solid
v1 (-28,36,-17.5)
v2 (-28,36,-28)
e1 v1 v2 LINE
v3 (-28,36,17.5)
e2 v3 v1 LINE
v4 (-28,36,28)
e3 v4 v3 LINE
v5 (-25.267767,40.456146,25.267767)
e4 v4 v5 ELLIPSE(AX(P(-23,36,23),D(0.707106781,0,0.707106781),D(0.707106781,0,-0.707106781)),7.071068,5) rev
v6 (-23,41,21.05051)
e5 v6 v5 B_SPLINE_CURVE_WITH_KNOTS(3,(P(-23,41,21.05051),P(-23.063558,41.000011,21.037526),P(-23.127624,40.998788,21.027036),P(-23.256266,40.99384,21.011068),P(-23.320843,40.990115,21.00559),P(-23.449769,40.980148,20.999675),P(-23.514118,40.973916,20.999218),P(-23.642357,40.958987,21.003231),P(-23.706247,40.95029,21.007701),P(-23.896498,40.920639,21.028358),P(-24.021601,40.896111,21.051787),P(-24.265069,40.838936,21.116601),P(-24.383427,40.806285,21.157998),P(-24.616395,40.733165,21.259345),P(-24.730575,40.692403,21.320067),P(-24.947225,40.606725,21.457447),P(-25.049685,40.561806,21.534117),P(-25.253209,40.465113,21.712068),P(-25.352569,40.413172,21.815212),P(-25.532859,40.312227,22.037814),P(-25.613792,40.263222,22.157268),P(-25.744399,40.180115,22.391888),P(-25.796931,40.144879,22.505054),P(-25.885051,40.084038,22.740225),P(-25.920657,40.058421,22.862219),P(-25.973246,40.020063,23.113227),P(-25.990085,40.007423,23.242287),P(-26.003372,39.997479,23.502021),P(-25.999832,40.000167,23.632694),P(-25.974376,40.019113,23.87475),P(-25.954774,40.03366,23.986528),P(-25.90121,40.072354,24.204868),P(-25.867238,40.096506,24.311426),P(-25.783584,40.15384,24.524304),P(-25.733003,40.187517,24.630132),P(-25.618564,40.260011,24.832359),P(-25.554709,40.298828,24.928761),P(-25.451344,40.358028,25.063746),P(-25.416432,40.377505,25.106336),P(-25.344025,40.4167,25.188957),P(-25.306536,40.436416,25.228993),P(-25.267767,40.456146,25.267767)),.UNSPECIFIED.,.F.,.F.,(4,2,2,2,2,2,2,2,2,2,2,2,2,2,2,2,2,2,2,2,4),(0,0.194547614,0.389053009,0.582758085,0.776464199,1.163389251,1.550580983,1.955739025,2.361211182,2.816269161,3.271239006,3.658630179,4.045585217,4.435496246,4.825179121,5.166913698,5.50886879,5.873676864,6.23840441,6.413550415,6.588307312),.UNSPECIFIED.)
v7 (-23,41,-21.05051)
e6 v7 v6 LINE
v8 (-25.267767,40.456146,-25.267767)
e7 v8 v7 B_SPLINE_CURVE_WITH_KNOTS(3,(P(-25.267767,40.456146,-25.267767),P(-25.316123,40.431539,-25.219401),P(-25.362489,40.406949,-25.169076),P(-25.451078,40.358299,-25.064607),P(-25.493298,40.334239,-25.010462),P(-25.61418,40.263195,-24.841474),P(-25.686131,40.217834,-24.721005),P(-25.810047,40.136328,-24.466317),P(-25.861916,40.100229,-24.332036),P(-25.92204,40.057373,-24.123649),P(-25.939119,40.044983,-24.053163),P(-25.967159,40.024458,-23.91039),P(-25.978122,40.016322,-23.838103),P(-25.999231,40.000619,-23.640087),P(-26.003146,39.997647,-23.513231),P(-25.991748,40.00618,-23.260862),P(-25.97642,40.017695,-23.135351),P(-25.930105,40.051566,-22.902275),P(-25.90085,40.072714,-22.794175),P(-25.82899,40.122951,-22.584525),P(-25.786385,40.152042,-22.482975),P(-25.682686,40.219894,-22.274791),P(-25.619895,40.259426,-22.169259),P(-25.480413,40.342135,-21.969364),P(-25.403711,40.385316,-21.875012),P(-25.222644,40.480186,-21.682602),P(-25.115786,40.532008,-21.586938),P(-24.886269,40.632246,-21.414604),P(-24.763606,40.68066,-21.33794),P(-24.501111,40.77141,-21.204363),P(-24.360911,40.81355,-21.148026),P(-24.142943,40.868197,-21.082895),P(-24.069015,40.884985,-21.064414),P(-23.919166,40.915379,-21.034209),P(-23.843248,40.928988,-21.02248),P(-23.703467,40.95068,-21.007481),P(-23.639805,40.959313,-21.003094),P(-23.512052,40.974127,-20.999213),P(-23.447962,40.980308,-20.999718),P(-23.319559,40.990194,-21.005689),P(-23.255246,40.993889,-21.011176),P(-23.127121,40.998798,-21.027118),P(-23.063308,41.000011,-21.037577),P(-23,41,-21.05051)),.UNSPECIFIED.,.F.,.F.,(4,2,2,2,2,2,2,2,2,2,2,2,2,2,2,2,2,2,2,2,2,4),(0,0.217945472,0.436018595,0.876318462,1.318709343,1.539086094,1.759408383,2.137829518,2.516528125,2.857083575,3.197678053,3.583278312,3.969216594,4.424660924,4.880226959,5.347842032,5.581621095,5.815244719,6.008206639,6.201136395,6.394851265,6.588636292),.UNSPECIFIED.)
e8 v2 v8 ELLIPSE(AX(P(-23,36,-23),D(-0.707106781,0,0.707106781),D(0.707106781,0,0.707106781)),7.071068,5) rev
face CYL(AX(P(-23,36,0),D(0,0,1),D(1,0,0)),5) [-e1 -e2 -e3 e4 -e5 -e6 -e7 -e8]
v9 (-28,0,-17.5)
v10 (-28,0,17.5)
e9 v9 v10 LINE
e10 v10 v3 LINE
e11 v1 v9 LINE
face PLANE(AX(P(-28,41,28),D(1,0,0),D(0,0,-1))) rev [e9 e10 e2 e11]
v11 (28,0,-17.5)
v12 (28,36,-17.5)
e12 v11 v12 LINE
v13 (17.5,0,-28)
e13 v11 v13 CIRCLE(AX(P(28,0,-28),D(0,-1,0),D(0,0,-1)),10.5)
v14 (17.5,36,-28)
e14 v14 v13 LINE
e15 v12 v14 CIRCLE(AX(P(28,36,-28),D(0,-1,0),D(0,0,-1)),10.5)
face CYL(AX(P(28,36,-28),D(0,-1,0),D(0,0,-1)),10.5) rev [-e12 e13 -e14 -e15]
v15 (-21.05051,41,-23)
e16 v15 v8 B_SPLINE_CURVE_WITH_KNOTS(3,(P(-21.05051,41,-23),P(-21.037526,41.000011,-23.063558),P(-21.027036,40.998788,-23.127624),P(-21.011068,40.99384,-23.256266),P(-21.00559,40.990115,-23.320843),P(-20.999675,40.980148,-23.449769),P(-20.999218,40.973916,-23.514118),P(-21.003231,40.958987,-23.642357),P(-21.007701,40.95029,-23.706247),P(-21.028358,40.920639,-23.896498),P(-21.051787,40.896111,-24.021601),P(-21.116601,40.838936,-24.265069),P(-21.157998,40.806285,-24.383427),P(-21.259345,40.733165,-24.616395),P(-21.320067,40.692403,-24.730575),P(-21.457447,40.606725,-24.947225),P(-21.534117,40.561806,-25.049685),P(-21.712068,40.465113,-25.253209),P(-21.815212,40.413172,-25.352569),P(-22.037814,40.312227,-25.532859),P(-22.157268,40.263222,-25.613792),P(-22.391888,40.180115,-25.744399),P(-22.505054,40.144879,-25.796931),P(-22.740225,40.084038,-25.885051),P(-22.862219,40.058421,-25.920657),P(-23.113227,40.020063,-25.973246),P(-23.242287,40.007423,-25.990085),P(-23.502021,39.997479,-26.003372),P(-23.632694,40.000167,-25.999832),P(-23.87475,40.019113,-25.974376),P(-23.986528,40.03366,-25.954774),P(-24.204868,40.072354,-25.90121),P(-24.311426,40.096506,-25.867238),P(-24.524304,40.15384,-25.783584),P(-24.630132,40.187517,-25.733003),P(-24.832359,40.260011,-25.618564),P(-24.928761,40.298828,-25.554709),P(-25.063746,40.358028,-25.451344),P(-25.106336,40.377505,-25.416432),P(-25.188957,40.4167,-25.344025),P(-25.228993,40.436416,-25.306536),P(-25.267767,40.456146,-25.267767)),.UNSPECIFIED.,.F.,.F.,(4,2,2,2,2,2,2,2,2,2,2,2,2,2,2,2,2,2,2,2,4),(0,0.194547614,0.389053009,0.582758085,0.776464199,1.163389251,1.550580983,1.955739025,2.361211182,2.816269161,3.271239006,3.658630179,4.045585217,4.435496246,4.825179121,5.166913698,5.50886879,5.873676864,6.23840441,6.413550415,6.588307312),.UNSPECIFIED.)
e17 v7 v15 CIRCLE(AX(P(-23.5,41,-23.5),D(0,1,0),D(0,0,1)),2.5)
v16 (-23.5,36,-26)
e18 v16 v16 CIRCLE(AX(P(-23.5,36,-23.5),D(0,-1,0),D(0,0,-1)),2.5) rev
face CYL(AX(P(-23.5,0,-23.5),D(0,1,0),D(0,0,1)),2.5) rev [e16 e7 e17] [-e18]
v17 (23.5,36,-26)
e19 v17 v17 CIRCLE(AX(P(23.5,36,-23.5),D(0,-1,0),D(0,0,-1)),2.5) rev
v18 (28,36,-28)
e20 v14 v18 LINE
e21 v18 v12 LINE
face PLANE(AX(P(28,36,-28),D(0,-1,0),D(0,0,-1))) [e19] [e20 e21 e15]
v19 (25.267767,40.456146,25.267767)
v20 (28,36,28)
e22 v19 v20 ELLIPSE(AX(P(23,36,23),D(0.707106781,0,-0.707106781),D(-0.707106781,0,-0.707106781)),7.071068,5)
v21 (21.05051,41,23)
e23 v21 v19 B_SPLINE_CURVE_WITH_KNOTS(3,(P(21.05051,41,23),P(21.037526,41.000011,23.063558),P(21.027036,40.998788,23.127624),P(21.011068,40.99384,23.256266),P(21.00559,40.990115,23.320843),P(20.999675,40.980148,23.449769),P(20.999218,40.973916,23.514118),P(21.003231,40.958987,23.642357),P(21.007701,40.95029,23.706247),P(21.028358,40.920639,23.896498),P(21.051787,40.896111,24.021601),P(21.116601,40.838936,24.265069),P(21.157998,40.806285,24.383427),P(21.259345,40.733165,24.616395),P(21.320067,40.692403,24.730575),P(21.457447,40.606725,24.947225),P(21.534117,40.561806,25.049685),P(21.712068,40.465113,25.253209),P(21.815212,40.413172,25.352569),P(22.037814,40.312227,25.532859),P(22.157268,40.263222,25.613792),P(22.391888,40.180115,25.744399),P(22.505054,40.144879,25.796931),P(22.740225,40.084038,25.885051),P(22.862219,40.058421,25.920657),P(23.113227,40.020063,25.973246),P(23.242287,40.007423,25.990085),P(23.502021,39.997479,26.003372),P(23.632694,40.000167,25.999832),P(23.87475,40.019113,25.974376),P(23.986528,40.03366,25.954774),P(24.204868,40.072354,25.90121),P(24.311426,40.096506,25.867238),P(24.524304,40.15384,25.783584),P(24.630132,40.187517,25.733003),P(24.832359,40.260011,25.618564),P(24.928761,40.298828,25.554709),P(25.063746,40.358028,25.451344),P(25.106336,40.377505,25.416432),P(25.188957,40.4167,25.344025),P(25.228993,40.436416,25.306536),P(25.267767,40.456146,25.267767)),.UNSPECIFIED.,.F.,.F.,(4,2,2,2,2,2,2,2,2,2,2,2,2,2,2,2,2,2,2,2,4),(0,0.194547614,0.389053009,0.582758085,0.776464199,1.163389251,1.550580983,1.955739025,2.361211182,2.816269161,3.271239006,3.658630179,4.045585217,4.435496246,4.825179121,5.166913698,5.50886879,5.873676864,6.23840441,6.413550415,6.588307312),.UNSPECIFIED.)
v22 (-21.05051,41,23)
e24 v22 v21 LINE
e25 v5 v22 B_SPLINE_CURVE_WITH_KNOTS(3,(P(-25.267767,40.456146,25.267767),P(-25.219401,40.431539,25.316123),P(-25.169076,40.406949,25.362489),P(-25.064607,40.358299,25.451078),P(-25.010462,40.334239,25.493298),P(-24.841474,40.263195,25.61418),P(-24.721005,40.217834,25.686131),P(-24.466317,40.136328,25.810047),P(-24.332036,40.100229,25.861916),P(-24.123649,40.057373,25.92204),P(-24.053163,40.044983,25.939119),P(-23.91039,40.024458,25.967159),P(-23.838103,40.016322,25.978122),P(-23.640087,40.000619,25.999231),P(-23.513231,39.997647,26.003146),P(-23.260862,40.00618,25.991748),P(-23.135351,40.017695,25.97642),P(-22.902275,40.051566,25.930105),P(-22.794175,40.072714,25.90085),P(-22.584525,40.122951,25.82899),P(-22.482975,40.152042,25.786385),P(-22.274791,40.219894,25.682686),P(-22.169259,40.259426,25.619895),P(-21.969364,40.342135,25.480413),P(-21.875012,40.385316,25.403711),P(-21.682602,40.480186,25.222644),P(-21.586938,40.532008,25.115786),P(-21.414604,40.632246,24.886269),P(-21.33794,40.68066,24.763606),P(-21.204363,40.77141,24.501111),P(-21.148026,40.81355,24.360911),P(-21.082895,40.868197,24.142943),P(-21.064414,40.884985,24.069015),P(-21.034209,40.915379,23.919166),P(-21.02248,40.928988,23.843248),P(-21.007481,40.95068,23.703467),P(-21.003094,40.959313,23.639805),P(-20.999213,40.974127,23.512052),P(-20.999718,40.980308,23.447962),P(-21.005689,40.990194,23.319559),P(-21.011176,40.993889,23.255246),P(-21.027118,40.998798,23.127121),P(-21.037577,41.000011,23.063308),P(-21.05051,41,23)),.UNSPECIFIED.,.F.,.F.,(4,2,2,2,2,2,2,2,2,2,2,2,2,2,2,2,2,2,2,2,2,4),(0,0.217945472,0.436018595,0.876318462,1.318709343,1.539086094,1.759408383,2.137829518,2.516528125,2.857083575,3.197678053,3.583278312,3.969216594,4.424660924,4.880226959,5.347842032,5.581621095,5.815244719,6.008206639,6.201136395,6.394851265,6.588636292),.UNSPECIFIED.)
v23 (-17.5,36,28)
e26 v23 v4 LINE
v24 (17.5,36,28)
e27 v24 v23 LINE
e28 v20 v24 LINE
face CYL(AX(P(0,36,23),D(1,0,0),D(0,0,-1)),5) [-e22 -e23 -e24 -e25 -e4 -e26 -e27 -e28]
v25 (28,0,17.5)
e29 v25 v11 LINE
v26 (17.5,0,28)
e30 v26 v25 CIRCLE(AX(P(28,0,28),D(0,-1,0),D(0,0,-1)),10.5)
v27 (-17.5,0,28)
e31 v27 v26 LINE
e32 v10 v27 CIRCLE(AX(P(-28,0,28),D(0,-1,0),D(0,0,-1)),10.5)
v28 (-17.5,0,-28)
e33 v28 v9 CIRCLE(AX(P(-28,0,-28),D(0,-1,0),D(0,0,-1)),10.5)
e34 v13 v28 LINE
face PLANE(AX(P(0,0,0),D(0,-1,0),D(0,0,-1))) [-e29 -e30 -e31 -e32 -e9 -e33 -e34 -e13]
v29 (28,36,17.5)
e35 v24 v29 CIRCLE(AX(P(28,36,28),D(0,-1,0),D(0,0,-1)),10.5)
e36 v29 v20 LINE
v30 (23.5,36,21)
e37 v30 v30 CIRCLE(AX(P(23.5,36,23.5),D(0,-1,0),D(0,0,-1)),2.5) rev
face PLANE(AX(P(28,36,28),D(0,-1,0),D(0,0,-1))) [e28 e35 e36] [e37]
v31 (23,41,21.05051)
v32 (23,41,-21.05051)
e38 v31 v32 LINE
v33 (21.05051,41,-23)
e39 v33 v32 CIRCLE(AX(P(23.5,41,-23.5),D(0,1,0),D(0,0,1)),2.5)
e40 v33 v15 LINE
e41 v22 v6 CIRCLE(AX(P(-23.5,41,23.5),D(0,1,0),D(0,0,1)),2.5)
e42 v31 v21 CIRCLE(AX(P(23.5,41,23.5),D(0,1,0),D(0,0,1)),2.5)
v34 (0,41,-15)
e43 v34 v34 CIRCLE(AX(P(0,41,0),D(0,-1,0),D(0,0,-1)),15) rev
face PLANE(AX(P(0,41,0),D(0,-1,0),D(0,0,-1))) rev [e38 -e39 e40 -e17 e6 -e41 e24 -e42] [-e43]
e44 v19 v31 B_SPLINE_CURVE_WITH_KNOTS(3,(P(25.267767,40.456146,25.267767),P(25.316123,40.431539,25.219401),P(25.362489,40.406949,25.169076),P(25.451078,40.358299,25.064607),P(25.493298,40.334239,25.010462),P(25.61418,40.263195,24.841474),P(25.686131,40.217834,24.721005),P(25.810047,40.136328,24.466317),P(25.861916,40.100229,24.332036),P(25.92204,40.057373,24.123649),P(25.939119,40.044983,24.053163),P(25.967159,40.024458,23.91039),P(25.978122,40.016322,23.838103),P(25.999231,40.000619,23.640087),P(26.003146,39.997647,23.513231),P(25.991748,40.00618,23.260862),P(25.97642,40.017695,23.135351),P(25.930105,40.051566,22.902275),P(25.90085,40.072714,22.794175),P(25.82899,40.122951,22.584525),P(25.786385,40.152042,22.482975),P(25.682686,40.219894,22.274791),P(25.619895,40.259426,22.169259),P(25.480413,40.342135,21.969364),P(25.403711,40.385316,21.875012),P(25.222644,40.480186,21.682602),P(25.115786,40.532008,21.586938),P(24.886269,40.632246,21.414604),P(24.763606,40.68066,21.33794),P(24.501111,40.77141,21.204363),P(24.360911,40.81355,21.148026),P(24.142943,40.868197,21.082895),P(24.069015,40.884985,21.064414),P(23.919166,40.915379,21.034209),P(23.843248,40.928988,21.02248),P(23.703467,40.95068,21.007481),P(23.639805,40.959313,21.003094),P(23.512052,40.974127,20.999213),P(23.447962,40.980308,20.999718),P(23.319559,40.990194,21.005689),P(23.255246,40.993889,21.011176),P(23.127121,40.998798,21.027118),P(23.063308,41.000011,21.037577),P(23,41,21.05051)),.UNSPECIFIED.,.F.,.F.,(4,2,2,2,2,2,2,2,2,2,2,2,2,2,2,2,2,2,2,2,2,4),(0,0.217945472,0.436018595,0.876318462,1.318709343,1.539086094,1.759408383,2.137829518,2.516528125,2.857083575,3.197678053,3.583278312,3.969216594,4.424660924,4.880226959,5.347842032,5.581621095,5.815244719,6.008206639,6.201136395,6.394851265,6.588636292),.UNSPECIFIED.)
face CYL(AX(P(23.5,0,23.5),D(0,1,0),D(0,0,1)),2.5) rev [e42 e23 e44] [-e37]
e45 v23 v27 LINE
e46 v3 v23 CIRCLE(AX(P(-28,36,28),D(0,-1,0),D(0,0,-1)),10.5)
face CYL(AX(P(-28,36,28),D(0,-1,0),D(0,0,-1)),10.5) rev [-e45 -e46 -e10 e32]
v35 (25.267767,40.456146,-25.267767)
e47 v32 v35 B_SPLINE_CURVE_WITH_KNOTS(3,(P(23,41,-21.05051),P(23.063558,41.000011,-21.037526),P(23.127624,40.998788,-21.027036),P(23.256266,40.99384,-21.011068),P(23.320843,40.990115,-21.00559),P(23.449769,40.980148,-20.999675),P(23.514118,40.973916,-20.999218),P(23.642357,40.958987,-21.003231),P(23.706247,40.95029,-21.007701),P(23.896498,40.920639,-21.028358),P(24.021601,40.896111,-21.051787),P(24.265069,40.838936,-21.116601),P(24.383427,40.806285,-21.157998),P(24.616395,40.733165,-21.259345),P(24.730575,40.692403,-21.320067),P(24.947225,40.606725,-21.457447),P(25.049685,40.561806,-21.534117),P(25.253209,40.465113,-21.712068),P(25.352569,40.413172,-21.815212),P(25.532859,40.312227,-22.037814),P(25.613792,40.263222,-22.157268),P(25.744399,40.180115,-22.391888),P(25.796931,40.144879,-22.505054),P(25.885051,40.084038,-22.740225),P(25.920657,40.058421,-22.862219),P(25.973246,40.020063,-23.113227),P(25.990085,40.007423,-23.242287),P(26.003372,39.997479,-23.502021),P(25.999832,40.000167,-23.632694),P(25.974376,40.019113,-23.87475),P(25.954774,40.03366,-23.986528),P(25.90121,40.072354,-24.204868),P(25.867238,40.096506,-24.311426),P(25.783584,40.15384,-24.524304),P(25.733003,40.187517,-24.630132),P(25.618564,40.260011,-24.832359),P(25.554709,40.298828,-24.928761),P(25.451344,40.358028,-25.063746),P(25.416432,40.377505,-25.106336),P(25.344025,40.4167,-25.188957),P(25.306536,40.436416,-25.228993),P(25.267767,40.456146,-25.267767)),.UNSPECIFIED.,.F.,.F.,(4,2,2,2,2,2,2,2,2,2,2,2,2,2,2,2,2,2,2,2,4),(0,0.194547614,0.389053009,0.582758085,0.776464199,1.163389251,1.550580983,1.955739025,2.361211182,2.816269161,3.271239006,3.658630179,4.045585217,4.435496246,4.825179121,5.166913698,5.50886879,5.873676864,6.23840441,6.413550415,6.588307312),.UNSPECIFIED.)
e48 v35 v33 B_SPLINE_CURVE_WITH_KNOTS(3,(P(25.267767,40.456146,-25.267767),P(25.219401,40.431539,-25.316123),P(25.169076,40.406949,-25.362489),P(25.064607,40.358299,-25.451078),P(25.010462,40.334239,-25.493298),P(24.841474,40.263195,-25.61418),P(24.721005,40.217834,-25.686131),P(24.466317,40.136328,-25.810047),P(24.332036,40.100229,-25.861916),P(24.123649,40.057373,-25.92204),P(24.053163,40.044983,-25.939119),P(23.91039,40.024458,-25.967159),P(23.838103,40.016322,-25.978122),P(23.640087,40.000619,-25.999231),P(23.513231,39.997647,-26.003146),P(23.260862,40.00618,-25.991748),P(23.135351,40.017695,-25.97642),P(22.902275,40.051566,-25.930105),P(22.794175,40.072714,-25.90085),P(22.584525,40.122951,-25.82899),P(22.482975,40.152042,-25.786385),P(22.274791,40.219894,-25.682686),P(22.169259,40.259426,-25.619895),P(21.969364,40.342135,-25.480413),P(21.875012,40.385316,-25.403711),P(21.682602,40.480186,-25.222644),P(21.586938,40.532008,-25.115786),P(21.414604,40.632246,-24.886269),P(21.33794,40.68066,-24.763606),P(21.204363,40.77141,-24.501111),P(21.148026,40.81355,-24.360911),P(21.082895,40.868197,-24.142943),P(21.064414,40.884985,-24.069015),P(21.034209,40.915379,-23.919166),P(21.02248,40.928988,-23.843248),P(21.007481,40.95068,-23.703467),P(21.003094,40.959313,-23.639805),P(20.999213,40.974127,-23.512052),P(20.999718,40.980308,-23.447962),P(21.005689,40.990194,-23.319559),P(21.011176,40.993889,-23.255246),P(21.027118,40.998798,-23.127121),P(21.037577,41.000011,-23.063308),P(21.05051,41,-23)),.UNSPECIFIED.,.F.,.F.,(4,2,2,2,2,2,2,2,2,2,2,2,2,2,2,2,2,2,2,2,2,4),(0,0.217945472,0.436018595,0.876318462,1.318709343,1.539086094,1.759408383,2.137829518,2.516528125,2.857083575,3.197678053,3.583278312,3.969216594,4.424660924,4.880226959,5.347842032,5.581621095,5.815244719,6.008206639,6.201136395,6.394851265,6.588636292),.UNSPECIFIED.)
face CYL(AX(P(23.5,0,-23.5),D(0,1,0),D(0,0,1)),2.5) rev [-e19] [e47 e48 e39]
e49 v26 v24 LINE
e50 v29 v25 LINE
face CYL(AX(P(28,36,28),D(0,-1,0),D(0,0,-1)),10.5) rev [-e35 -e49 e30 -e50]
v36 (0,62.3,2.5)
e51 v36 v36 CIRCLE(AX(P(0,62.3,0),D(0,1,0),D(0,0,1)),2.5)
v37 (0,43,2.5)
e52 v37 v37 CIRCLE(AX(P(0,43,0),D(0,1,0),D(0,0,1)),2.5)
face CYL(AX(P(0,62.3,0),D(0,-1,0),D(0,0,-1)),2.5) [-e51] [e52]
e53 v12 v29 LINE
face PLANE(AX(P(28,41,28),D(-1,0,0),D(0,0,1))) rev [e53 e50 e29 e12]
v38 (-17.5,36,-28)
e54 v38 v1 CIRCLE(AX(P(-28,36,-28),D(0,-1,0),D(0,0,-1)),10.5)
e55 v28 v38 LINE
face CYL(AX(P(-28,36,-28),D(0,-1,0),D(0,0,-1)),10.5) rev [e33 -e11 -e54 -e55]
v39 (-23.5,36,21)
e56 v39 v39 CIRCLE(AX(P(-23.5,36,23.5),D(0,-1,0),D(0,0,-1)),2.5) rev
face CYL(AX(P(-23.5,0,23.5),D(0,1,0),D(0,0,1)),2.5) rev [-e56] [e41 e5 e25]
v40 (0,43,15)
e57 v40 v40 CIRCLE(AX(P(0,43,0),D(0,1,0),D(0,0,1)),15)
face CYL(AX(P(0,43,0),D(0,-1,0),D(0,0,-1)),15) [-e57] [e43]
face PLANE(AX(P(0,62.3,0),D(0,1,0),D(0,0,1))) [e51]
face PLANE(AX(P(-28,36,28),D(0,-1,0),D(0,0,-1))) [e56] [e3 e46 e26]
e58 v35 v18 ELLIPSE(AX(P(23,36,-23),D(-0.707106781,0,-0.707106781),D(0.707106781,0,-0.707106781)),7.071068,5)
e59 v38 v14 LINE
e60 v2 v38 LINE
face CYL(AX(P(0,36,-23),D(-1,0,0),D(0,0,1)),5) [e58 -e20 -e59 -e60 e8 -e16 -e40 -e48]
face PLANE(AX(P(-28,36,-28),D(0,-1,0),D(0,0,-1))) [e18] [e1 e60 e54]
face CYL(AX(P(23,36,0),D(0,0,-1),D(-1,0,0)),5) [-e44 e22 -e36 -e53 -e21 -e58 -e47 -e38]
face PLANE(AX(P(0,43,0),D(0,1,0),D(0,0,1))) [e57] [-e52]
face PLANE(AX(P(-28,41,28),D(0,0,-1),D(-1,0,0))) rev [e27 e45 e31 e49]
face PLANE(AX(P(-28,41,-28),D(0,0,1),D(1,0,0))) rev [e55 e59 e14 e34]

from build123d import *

# Parameters (mm, degrees)
SCHIZZO1_W                   = 56
SCHIZZO1_H                   = 56
ESTRUSIONE_ESTRUSIONE1_DEPTH = 41
SCHIZZO2_R                   = 2.5
TAGLIO_ESTRUSIONE1_DEPTH     = 41
SCHIZZO3_R                   = 15
ESTRUSIONE_ESTRUSIONE3_DEPTH = 2
SCHIZZO4_R                   = 2.5
ESTRUSIONE_ESTRUSIONE4_DEPTH = 19.3
SCHIZZO5_R                   = 10.5
TAGLIO_ESTRUSIONE2_DEPTH     = 36
CONG_1_R                     = 5


with BuildPart() as part:
    # Schizzo1 → Estrusione-Estrusione1 (new body)
    with BuildSketch(Plane(origin=(0, 0, 0), x_dir=(1, 0, 0), z_dir=(0, 1, 0))):
        Rectangle(SCHIZZO1_W, SCHIZZO1_H)
    extrude(amount=ESTRUSIONE_ESTRUSIONE1_DEPTH)

    # Schizzo2 → Taglio-Estrusione1 (cut)
    with BuildSketch(Plane(origin=(0, 41, 0), x_dir=(1, 0, 0), z_dir=(0, 1, 0))):
        with Locations(Location((-23.5, 23.5, 0), (0, 0, 270))):
            Circle(SCHIZZO2_R)
        with Locations(Location((23.5, 23.5, 0), (0, 0, 270))):
            Circle(SCHIZZO2_R)
        with Locations(Location((23.5, -23.5, 0), (0, 0, 270))):
            Circle(SCHIZZO2_R)
        with Locations(Location((-23.5, -23.5, 0), (0, 0, 270))):
            Circle(SCHIZZO2_R)
    extrude(amount=-TAGLIO_ESTRUSIONE1_DEPTH, mode=Mode.SUBTRACT)

    # Schizzo3 → Estrusione-Estrusione3 (add)
    with BuildSketch(Plane(origin=(0, 41, 0), x_dir=(1, 0, 0), z_dir=(0, 1, 0))):
        with Locations(Location((0, 0, 0), (0, 0, 90))):
            Circle(SCHIZZO3_R)
    extrude(amount=ESTRUSIONE_ESTRUSIONE3_DEPTH)

    # Schizzo4 → Estrusione-Estrusione4 (add)
    with BuildSketch(Plane(origin=(0, 43, 0), x_dir=(1, 0, 0), z_dir=(0, 1, 0))):
        with Locations(Location((0, 0, 0), (0, 0, 270))):
            Circle(SCHIZZO4_R)
    extrude(amount=ESTRUSIONE_ESTRUSIONE4_DEPTH)

    # Schizzo5 → Taglio-Estrusione2 (cut)
    with BuildSketch(Plane.XZ):
        with Locations((-28, 28)):
            Circle(SCHIZZO5_R)
        with Locations((28, 28)):
            Circle(SCHIZZO5_R)
        with Locations((28, -28)):
            Circle(SCHIZZO5_R)
        with Locations((-28, -28)):
            Circle(SCHIZZO5_R)
    extrude(amount=-TAGLIO_ESTRUSIONE2_DEPTH, mode=Mode.SUBTRACT)

    # Congé1
    # the kernel refuses this fillet: 5 mm, written as the material it takes off along each edge
    with BuildSketch(Plane(origin=(40.5, 41, -28), x_dir=(0, 0, 1), z_dir=(-1, 0, 0)), Plane(origin=(-28, 41, -40.5), x_dir=(1, 0, 0), z_dir=(0, 0, 1))) as cong_1_piece_1:
        with BuildLine():
            CenterArc((CONG_1_R, -CONG_1_R), CONG_1_R, 90, 90)
            Line((0, -CONG_1_R), (0, 0))
            Line((0, 0), (CONG_1_R, 0))
        make_face()
    extrude(amount=81, mode=Mode.SUBTRACT)
    with BuildSketch(Plane(origin=(-40.5, 41, 28), x_dir=(0, -1, 0), z_dir=(1, 0, 0)), Plane(origin=(28, 41, 40.5), x_dir=(0, -1, 0), z_dir=(0, 0, -1))) as cong_1_piece_2:
        with BuildLine():
            CenterArc((CONG_1_R, CONG_1_R), CONG_1_R, 180, 90)
            Line((0, CONG_1_R), (0, 0))
            Line((0, 0), (CONG_1_R, 0))
        make_face()
    extrude(amount=81, mode=Mode.SUBTRACT)


solid = part.part
